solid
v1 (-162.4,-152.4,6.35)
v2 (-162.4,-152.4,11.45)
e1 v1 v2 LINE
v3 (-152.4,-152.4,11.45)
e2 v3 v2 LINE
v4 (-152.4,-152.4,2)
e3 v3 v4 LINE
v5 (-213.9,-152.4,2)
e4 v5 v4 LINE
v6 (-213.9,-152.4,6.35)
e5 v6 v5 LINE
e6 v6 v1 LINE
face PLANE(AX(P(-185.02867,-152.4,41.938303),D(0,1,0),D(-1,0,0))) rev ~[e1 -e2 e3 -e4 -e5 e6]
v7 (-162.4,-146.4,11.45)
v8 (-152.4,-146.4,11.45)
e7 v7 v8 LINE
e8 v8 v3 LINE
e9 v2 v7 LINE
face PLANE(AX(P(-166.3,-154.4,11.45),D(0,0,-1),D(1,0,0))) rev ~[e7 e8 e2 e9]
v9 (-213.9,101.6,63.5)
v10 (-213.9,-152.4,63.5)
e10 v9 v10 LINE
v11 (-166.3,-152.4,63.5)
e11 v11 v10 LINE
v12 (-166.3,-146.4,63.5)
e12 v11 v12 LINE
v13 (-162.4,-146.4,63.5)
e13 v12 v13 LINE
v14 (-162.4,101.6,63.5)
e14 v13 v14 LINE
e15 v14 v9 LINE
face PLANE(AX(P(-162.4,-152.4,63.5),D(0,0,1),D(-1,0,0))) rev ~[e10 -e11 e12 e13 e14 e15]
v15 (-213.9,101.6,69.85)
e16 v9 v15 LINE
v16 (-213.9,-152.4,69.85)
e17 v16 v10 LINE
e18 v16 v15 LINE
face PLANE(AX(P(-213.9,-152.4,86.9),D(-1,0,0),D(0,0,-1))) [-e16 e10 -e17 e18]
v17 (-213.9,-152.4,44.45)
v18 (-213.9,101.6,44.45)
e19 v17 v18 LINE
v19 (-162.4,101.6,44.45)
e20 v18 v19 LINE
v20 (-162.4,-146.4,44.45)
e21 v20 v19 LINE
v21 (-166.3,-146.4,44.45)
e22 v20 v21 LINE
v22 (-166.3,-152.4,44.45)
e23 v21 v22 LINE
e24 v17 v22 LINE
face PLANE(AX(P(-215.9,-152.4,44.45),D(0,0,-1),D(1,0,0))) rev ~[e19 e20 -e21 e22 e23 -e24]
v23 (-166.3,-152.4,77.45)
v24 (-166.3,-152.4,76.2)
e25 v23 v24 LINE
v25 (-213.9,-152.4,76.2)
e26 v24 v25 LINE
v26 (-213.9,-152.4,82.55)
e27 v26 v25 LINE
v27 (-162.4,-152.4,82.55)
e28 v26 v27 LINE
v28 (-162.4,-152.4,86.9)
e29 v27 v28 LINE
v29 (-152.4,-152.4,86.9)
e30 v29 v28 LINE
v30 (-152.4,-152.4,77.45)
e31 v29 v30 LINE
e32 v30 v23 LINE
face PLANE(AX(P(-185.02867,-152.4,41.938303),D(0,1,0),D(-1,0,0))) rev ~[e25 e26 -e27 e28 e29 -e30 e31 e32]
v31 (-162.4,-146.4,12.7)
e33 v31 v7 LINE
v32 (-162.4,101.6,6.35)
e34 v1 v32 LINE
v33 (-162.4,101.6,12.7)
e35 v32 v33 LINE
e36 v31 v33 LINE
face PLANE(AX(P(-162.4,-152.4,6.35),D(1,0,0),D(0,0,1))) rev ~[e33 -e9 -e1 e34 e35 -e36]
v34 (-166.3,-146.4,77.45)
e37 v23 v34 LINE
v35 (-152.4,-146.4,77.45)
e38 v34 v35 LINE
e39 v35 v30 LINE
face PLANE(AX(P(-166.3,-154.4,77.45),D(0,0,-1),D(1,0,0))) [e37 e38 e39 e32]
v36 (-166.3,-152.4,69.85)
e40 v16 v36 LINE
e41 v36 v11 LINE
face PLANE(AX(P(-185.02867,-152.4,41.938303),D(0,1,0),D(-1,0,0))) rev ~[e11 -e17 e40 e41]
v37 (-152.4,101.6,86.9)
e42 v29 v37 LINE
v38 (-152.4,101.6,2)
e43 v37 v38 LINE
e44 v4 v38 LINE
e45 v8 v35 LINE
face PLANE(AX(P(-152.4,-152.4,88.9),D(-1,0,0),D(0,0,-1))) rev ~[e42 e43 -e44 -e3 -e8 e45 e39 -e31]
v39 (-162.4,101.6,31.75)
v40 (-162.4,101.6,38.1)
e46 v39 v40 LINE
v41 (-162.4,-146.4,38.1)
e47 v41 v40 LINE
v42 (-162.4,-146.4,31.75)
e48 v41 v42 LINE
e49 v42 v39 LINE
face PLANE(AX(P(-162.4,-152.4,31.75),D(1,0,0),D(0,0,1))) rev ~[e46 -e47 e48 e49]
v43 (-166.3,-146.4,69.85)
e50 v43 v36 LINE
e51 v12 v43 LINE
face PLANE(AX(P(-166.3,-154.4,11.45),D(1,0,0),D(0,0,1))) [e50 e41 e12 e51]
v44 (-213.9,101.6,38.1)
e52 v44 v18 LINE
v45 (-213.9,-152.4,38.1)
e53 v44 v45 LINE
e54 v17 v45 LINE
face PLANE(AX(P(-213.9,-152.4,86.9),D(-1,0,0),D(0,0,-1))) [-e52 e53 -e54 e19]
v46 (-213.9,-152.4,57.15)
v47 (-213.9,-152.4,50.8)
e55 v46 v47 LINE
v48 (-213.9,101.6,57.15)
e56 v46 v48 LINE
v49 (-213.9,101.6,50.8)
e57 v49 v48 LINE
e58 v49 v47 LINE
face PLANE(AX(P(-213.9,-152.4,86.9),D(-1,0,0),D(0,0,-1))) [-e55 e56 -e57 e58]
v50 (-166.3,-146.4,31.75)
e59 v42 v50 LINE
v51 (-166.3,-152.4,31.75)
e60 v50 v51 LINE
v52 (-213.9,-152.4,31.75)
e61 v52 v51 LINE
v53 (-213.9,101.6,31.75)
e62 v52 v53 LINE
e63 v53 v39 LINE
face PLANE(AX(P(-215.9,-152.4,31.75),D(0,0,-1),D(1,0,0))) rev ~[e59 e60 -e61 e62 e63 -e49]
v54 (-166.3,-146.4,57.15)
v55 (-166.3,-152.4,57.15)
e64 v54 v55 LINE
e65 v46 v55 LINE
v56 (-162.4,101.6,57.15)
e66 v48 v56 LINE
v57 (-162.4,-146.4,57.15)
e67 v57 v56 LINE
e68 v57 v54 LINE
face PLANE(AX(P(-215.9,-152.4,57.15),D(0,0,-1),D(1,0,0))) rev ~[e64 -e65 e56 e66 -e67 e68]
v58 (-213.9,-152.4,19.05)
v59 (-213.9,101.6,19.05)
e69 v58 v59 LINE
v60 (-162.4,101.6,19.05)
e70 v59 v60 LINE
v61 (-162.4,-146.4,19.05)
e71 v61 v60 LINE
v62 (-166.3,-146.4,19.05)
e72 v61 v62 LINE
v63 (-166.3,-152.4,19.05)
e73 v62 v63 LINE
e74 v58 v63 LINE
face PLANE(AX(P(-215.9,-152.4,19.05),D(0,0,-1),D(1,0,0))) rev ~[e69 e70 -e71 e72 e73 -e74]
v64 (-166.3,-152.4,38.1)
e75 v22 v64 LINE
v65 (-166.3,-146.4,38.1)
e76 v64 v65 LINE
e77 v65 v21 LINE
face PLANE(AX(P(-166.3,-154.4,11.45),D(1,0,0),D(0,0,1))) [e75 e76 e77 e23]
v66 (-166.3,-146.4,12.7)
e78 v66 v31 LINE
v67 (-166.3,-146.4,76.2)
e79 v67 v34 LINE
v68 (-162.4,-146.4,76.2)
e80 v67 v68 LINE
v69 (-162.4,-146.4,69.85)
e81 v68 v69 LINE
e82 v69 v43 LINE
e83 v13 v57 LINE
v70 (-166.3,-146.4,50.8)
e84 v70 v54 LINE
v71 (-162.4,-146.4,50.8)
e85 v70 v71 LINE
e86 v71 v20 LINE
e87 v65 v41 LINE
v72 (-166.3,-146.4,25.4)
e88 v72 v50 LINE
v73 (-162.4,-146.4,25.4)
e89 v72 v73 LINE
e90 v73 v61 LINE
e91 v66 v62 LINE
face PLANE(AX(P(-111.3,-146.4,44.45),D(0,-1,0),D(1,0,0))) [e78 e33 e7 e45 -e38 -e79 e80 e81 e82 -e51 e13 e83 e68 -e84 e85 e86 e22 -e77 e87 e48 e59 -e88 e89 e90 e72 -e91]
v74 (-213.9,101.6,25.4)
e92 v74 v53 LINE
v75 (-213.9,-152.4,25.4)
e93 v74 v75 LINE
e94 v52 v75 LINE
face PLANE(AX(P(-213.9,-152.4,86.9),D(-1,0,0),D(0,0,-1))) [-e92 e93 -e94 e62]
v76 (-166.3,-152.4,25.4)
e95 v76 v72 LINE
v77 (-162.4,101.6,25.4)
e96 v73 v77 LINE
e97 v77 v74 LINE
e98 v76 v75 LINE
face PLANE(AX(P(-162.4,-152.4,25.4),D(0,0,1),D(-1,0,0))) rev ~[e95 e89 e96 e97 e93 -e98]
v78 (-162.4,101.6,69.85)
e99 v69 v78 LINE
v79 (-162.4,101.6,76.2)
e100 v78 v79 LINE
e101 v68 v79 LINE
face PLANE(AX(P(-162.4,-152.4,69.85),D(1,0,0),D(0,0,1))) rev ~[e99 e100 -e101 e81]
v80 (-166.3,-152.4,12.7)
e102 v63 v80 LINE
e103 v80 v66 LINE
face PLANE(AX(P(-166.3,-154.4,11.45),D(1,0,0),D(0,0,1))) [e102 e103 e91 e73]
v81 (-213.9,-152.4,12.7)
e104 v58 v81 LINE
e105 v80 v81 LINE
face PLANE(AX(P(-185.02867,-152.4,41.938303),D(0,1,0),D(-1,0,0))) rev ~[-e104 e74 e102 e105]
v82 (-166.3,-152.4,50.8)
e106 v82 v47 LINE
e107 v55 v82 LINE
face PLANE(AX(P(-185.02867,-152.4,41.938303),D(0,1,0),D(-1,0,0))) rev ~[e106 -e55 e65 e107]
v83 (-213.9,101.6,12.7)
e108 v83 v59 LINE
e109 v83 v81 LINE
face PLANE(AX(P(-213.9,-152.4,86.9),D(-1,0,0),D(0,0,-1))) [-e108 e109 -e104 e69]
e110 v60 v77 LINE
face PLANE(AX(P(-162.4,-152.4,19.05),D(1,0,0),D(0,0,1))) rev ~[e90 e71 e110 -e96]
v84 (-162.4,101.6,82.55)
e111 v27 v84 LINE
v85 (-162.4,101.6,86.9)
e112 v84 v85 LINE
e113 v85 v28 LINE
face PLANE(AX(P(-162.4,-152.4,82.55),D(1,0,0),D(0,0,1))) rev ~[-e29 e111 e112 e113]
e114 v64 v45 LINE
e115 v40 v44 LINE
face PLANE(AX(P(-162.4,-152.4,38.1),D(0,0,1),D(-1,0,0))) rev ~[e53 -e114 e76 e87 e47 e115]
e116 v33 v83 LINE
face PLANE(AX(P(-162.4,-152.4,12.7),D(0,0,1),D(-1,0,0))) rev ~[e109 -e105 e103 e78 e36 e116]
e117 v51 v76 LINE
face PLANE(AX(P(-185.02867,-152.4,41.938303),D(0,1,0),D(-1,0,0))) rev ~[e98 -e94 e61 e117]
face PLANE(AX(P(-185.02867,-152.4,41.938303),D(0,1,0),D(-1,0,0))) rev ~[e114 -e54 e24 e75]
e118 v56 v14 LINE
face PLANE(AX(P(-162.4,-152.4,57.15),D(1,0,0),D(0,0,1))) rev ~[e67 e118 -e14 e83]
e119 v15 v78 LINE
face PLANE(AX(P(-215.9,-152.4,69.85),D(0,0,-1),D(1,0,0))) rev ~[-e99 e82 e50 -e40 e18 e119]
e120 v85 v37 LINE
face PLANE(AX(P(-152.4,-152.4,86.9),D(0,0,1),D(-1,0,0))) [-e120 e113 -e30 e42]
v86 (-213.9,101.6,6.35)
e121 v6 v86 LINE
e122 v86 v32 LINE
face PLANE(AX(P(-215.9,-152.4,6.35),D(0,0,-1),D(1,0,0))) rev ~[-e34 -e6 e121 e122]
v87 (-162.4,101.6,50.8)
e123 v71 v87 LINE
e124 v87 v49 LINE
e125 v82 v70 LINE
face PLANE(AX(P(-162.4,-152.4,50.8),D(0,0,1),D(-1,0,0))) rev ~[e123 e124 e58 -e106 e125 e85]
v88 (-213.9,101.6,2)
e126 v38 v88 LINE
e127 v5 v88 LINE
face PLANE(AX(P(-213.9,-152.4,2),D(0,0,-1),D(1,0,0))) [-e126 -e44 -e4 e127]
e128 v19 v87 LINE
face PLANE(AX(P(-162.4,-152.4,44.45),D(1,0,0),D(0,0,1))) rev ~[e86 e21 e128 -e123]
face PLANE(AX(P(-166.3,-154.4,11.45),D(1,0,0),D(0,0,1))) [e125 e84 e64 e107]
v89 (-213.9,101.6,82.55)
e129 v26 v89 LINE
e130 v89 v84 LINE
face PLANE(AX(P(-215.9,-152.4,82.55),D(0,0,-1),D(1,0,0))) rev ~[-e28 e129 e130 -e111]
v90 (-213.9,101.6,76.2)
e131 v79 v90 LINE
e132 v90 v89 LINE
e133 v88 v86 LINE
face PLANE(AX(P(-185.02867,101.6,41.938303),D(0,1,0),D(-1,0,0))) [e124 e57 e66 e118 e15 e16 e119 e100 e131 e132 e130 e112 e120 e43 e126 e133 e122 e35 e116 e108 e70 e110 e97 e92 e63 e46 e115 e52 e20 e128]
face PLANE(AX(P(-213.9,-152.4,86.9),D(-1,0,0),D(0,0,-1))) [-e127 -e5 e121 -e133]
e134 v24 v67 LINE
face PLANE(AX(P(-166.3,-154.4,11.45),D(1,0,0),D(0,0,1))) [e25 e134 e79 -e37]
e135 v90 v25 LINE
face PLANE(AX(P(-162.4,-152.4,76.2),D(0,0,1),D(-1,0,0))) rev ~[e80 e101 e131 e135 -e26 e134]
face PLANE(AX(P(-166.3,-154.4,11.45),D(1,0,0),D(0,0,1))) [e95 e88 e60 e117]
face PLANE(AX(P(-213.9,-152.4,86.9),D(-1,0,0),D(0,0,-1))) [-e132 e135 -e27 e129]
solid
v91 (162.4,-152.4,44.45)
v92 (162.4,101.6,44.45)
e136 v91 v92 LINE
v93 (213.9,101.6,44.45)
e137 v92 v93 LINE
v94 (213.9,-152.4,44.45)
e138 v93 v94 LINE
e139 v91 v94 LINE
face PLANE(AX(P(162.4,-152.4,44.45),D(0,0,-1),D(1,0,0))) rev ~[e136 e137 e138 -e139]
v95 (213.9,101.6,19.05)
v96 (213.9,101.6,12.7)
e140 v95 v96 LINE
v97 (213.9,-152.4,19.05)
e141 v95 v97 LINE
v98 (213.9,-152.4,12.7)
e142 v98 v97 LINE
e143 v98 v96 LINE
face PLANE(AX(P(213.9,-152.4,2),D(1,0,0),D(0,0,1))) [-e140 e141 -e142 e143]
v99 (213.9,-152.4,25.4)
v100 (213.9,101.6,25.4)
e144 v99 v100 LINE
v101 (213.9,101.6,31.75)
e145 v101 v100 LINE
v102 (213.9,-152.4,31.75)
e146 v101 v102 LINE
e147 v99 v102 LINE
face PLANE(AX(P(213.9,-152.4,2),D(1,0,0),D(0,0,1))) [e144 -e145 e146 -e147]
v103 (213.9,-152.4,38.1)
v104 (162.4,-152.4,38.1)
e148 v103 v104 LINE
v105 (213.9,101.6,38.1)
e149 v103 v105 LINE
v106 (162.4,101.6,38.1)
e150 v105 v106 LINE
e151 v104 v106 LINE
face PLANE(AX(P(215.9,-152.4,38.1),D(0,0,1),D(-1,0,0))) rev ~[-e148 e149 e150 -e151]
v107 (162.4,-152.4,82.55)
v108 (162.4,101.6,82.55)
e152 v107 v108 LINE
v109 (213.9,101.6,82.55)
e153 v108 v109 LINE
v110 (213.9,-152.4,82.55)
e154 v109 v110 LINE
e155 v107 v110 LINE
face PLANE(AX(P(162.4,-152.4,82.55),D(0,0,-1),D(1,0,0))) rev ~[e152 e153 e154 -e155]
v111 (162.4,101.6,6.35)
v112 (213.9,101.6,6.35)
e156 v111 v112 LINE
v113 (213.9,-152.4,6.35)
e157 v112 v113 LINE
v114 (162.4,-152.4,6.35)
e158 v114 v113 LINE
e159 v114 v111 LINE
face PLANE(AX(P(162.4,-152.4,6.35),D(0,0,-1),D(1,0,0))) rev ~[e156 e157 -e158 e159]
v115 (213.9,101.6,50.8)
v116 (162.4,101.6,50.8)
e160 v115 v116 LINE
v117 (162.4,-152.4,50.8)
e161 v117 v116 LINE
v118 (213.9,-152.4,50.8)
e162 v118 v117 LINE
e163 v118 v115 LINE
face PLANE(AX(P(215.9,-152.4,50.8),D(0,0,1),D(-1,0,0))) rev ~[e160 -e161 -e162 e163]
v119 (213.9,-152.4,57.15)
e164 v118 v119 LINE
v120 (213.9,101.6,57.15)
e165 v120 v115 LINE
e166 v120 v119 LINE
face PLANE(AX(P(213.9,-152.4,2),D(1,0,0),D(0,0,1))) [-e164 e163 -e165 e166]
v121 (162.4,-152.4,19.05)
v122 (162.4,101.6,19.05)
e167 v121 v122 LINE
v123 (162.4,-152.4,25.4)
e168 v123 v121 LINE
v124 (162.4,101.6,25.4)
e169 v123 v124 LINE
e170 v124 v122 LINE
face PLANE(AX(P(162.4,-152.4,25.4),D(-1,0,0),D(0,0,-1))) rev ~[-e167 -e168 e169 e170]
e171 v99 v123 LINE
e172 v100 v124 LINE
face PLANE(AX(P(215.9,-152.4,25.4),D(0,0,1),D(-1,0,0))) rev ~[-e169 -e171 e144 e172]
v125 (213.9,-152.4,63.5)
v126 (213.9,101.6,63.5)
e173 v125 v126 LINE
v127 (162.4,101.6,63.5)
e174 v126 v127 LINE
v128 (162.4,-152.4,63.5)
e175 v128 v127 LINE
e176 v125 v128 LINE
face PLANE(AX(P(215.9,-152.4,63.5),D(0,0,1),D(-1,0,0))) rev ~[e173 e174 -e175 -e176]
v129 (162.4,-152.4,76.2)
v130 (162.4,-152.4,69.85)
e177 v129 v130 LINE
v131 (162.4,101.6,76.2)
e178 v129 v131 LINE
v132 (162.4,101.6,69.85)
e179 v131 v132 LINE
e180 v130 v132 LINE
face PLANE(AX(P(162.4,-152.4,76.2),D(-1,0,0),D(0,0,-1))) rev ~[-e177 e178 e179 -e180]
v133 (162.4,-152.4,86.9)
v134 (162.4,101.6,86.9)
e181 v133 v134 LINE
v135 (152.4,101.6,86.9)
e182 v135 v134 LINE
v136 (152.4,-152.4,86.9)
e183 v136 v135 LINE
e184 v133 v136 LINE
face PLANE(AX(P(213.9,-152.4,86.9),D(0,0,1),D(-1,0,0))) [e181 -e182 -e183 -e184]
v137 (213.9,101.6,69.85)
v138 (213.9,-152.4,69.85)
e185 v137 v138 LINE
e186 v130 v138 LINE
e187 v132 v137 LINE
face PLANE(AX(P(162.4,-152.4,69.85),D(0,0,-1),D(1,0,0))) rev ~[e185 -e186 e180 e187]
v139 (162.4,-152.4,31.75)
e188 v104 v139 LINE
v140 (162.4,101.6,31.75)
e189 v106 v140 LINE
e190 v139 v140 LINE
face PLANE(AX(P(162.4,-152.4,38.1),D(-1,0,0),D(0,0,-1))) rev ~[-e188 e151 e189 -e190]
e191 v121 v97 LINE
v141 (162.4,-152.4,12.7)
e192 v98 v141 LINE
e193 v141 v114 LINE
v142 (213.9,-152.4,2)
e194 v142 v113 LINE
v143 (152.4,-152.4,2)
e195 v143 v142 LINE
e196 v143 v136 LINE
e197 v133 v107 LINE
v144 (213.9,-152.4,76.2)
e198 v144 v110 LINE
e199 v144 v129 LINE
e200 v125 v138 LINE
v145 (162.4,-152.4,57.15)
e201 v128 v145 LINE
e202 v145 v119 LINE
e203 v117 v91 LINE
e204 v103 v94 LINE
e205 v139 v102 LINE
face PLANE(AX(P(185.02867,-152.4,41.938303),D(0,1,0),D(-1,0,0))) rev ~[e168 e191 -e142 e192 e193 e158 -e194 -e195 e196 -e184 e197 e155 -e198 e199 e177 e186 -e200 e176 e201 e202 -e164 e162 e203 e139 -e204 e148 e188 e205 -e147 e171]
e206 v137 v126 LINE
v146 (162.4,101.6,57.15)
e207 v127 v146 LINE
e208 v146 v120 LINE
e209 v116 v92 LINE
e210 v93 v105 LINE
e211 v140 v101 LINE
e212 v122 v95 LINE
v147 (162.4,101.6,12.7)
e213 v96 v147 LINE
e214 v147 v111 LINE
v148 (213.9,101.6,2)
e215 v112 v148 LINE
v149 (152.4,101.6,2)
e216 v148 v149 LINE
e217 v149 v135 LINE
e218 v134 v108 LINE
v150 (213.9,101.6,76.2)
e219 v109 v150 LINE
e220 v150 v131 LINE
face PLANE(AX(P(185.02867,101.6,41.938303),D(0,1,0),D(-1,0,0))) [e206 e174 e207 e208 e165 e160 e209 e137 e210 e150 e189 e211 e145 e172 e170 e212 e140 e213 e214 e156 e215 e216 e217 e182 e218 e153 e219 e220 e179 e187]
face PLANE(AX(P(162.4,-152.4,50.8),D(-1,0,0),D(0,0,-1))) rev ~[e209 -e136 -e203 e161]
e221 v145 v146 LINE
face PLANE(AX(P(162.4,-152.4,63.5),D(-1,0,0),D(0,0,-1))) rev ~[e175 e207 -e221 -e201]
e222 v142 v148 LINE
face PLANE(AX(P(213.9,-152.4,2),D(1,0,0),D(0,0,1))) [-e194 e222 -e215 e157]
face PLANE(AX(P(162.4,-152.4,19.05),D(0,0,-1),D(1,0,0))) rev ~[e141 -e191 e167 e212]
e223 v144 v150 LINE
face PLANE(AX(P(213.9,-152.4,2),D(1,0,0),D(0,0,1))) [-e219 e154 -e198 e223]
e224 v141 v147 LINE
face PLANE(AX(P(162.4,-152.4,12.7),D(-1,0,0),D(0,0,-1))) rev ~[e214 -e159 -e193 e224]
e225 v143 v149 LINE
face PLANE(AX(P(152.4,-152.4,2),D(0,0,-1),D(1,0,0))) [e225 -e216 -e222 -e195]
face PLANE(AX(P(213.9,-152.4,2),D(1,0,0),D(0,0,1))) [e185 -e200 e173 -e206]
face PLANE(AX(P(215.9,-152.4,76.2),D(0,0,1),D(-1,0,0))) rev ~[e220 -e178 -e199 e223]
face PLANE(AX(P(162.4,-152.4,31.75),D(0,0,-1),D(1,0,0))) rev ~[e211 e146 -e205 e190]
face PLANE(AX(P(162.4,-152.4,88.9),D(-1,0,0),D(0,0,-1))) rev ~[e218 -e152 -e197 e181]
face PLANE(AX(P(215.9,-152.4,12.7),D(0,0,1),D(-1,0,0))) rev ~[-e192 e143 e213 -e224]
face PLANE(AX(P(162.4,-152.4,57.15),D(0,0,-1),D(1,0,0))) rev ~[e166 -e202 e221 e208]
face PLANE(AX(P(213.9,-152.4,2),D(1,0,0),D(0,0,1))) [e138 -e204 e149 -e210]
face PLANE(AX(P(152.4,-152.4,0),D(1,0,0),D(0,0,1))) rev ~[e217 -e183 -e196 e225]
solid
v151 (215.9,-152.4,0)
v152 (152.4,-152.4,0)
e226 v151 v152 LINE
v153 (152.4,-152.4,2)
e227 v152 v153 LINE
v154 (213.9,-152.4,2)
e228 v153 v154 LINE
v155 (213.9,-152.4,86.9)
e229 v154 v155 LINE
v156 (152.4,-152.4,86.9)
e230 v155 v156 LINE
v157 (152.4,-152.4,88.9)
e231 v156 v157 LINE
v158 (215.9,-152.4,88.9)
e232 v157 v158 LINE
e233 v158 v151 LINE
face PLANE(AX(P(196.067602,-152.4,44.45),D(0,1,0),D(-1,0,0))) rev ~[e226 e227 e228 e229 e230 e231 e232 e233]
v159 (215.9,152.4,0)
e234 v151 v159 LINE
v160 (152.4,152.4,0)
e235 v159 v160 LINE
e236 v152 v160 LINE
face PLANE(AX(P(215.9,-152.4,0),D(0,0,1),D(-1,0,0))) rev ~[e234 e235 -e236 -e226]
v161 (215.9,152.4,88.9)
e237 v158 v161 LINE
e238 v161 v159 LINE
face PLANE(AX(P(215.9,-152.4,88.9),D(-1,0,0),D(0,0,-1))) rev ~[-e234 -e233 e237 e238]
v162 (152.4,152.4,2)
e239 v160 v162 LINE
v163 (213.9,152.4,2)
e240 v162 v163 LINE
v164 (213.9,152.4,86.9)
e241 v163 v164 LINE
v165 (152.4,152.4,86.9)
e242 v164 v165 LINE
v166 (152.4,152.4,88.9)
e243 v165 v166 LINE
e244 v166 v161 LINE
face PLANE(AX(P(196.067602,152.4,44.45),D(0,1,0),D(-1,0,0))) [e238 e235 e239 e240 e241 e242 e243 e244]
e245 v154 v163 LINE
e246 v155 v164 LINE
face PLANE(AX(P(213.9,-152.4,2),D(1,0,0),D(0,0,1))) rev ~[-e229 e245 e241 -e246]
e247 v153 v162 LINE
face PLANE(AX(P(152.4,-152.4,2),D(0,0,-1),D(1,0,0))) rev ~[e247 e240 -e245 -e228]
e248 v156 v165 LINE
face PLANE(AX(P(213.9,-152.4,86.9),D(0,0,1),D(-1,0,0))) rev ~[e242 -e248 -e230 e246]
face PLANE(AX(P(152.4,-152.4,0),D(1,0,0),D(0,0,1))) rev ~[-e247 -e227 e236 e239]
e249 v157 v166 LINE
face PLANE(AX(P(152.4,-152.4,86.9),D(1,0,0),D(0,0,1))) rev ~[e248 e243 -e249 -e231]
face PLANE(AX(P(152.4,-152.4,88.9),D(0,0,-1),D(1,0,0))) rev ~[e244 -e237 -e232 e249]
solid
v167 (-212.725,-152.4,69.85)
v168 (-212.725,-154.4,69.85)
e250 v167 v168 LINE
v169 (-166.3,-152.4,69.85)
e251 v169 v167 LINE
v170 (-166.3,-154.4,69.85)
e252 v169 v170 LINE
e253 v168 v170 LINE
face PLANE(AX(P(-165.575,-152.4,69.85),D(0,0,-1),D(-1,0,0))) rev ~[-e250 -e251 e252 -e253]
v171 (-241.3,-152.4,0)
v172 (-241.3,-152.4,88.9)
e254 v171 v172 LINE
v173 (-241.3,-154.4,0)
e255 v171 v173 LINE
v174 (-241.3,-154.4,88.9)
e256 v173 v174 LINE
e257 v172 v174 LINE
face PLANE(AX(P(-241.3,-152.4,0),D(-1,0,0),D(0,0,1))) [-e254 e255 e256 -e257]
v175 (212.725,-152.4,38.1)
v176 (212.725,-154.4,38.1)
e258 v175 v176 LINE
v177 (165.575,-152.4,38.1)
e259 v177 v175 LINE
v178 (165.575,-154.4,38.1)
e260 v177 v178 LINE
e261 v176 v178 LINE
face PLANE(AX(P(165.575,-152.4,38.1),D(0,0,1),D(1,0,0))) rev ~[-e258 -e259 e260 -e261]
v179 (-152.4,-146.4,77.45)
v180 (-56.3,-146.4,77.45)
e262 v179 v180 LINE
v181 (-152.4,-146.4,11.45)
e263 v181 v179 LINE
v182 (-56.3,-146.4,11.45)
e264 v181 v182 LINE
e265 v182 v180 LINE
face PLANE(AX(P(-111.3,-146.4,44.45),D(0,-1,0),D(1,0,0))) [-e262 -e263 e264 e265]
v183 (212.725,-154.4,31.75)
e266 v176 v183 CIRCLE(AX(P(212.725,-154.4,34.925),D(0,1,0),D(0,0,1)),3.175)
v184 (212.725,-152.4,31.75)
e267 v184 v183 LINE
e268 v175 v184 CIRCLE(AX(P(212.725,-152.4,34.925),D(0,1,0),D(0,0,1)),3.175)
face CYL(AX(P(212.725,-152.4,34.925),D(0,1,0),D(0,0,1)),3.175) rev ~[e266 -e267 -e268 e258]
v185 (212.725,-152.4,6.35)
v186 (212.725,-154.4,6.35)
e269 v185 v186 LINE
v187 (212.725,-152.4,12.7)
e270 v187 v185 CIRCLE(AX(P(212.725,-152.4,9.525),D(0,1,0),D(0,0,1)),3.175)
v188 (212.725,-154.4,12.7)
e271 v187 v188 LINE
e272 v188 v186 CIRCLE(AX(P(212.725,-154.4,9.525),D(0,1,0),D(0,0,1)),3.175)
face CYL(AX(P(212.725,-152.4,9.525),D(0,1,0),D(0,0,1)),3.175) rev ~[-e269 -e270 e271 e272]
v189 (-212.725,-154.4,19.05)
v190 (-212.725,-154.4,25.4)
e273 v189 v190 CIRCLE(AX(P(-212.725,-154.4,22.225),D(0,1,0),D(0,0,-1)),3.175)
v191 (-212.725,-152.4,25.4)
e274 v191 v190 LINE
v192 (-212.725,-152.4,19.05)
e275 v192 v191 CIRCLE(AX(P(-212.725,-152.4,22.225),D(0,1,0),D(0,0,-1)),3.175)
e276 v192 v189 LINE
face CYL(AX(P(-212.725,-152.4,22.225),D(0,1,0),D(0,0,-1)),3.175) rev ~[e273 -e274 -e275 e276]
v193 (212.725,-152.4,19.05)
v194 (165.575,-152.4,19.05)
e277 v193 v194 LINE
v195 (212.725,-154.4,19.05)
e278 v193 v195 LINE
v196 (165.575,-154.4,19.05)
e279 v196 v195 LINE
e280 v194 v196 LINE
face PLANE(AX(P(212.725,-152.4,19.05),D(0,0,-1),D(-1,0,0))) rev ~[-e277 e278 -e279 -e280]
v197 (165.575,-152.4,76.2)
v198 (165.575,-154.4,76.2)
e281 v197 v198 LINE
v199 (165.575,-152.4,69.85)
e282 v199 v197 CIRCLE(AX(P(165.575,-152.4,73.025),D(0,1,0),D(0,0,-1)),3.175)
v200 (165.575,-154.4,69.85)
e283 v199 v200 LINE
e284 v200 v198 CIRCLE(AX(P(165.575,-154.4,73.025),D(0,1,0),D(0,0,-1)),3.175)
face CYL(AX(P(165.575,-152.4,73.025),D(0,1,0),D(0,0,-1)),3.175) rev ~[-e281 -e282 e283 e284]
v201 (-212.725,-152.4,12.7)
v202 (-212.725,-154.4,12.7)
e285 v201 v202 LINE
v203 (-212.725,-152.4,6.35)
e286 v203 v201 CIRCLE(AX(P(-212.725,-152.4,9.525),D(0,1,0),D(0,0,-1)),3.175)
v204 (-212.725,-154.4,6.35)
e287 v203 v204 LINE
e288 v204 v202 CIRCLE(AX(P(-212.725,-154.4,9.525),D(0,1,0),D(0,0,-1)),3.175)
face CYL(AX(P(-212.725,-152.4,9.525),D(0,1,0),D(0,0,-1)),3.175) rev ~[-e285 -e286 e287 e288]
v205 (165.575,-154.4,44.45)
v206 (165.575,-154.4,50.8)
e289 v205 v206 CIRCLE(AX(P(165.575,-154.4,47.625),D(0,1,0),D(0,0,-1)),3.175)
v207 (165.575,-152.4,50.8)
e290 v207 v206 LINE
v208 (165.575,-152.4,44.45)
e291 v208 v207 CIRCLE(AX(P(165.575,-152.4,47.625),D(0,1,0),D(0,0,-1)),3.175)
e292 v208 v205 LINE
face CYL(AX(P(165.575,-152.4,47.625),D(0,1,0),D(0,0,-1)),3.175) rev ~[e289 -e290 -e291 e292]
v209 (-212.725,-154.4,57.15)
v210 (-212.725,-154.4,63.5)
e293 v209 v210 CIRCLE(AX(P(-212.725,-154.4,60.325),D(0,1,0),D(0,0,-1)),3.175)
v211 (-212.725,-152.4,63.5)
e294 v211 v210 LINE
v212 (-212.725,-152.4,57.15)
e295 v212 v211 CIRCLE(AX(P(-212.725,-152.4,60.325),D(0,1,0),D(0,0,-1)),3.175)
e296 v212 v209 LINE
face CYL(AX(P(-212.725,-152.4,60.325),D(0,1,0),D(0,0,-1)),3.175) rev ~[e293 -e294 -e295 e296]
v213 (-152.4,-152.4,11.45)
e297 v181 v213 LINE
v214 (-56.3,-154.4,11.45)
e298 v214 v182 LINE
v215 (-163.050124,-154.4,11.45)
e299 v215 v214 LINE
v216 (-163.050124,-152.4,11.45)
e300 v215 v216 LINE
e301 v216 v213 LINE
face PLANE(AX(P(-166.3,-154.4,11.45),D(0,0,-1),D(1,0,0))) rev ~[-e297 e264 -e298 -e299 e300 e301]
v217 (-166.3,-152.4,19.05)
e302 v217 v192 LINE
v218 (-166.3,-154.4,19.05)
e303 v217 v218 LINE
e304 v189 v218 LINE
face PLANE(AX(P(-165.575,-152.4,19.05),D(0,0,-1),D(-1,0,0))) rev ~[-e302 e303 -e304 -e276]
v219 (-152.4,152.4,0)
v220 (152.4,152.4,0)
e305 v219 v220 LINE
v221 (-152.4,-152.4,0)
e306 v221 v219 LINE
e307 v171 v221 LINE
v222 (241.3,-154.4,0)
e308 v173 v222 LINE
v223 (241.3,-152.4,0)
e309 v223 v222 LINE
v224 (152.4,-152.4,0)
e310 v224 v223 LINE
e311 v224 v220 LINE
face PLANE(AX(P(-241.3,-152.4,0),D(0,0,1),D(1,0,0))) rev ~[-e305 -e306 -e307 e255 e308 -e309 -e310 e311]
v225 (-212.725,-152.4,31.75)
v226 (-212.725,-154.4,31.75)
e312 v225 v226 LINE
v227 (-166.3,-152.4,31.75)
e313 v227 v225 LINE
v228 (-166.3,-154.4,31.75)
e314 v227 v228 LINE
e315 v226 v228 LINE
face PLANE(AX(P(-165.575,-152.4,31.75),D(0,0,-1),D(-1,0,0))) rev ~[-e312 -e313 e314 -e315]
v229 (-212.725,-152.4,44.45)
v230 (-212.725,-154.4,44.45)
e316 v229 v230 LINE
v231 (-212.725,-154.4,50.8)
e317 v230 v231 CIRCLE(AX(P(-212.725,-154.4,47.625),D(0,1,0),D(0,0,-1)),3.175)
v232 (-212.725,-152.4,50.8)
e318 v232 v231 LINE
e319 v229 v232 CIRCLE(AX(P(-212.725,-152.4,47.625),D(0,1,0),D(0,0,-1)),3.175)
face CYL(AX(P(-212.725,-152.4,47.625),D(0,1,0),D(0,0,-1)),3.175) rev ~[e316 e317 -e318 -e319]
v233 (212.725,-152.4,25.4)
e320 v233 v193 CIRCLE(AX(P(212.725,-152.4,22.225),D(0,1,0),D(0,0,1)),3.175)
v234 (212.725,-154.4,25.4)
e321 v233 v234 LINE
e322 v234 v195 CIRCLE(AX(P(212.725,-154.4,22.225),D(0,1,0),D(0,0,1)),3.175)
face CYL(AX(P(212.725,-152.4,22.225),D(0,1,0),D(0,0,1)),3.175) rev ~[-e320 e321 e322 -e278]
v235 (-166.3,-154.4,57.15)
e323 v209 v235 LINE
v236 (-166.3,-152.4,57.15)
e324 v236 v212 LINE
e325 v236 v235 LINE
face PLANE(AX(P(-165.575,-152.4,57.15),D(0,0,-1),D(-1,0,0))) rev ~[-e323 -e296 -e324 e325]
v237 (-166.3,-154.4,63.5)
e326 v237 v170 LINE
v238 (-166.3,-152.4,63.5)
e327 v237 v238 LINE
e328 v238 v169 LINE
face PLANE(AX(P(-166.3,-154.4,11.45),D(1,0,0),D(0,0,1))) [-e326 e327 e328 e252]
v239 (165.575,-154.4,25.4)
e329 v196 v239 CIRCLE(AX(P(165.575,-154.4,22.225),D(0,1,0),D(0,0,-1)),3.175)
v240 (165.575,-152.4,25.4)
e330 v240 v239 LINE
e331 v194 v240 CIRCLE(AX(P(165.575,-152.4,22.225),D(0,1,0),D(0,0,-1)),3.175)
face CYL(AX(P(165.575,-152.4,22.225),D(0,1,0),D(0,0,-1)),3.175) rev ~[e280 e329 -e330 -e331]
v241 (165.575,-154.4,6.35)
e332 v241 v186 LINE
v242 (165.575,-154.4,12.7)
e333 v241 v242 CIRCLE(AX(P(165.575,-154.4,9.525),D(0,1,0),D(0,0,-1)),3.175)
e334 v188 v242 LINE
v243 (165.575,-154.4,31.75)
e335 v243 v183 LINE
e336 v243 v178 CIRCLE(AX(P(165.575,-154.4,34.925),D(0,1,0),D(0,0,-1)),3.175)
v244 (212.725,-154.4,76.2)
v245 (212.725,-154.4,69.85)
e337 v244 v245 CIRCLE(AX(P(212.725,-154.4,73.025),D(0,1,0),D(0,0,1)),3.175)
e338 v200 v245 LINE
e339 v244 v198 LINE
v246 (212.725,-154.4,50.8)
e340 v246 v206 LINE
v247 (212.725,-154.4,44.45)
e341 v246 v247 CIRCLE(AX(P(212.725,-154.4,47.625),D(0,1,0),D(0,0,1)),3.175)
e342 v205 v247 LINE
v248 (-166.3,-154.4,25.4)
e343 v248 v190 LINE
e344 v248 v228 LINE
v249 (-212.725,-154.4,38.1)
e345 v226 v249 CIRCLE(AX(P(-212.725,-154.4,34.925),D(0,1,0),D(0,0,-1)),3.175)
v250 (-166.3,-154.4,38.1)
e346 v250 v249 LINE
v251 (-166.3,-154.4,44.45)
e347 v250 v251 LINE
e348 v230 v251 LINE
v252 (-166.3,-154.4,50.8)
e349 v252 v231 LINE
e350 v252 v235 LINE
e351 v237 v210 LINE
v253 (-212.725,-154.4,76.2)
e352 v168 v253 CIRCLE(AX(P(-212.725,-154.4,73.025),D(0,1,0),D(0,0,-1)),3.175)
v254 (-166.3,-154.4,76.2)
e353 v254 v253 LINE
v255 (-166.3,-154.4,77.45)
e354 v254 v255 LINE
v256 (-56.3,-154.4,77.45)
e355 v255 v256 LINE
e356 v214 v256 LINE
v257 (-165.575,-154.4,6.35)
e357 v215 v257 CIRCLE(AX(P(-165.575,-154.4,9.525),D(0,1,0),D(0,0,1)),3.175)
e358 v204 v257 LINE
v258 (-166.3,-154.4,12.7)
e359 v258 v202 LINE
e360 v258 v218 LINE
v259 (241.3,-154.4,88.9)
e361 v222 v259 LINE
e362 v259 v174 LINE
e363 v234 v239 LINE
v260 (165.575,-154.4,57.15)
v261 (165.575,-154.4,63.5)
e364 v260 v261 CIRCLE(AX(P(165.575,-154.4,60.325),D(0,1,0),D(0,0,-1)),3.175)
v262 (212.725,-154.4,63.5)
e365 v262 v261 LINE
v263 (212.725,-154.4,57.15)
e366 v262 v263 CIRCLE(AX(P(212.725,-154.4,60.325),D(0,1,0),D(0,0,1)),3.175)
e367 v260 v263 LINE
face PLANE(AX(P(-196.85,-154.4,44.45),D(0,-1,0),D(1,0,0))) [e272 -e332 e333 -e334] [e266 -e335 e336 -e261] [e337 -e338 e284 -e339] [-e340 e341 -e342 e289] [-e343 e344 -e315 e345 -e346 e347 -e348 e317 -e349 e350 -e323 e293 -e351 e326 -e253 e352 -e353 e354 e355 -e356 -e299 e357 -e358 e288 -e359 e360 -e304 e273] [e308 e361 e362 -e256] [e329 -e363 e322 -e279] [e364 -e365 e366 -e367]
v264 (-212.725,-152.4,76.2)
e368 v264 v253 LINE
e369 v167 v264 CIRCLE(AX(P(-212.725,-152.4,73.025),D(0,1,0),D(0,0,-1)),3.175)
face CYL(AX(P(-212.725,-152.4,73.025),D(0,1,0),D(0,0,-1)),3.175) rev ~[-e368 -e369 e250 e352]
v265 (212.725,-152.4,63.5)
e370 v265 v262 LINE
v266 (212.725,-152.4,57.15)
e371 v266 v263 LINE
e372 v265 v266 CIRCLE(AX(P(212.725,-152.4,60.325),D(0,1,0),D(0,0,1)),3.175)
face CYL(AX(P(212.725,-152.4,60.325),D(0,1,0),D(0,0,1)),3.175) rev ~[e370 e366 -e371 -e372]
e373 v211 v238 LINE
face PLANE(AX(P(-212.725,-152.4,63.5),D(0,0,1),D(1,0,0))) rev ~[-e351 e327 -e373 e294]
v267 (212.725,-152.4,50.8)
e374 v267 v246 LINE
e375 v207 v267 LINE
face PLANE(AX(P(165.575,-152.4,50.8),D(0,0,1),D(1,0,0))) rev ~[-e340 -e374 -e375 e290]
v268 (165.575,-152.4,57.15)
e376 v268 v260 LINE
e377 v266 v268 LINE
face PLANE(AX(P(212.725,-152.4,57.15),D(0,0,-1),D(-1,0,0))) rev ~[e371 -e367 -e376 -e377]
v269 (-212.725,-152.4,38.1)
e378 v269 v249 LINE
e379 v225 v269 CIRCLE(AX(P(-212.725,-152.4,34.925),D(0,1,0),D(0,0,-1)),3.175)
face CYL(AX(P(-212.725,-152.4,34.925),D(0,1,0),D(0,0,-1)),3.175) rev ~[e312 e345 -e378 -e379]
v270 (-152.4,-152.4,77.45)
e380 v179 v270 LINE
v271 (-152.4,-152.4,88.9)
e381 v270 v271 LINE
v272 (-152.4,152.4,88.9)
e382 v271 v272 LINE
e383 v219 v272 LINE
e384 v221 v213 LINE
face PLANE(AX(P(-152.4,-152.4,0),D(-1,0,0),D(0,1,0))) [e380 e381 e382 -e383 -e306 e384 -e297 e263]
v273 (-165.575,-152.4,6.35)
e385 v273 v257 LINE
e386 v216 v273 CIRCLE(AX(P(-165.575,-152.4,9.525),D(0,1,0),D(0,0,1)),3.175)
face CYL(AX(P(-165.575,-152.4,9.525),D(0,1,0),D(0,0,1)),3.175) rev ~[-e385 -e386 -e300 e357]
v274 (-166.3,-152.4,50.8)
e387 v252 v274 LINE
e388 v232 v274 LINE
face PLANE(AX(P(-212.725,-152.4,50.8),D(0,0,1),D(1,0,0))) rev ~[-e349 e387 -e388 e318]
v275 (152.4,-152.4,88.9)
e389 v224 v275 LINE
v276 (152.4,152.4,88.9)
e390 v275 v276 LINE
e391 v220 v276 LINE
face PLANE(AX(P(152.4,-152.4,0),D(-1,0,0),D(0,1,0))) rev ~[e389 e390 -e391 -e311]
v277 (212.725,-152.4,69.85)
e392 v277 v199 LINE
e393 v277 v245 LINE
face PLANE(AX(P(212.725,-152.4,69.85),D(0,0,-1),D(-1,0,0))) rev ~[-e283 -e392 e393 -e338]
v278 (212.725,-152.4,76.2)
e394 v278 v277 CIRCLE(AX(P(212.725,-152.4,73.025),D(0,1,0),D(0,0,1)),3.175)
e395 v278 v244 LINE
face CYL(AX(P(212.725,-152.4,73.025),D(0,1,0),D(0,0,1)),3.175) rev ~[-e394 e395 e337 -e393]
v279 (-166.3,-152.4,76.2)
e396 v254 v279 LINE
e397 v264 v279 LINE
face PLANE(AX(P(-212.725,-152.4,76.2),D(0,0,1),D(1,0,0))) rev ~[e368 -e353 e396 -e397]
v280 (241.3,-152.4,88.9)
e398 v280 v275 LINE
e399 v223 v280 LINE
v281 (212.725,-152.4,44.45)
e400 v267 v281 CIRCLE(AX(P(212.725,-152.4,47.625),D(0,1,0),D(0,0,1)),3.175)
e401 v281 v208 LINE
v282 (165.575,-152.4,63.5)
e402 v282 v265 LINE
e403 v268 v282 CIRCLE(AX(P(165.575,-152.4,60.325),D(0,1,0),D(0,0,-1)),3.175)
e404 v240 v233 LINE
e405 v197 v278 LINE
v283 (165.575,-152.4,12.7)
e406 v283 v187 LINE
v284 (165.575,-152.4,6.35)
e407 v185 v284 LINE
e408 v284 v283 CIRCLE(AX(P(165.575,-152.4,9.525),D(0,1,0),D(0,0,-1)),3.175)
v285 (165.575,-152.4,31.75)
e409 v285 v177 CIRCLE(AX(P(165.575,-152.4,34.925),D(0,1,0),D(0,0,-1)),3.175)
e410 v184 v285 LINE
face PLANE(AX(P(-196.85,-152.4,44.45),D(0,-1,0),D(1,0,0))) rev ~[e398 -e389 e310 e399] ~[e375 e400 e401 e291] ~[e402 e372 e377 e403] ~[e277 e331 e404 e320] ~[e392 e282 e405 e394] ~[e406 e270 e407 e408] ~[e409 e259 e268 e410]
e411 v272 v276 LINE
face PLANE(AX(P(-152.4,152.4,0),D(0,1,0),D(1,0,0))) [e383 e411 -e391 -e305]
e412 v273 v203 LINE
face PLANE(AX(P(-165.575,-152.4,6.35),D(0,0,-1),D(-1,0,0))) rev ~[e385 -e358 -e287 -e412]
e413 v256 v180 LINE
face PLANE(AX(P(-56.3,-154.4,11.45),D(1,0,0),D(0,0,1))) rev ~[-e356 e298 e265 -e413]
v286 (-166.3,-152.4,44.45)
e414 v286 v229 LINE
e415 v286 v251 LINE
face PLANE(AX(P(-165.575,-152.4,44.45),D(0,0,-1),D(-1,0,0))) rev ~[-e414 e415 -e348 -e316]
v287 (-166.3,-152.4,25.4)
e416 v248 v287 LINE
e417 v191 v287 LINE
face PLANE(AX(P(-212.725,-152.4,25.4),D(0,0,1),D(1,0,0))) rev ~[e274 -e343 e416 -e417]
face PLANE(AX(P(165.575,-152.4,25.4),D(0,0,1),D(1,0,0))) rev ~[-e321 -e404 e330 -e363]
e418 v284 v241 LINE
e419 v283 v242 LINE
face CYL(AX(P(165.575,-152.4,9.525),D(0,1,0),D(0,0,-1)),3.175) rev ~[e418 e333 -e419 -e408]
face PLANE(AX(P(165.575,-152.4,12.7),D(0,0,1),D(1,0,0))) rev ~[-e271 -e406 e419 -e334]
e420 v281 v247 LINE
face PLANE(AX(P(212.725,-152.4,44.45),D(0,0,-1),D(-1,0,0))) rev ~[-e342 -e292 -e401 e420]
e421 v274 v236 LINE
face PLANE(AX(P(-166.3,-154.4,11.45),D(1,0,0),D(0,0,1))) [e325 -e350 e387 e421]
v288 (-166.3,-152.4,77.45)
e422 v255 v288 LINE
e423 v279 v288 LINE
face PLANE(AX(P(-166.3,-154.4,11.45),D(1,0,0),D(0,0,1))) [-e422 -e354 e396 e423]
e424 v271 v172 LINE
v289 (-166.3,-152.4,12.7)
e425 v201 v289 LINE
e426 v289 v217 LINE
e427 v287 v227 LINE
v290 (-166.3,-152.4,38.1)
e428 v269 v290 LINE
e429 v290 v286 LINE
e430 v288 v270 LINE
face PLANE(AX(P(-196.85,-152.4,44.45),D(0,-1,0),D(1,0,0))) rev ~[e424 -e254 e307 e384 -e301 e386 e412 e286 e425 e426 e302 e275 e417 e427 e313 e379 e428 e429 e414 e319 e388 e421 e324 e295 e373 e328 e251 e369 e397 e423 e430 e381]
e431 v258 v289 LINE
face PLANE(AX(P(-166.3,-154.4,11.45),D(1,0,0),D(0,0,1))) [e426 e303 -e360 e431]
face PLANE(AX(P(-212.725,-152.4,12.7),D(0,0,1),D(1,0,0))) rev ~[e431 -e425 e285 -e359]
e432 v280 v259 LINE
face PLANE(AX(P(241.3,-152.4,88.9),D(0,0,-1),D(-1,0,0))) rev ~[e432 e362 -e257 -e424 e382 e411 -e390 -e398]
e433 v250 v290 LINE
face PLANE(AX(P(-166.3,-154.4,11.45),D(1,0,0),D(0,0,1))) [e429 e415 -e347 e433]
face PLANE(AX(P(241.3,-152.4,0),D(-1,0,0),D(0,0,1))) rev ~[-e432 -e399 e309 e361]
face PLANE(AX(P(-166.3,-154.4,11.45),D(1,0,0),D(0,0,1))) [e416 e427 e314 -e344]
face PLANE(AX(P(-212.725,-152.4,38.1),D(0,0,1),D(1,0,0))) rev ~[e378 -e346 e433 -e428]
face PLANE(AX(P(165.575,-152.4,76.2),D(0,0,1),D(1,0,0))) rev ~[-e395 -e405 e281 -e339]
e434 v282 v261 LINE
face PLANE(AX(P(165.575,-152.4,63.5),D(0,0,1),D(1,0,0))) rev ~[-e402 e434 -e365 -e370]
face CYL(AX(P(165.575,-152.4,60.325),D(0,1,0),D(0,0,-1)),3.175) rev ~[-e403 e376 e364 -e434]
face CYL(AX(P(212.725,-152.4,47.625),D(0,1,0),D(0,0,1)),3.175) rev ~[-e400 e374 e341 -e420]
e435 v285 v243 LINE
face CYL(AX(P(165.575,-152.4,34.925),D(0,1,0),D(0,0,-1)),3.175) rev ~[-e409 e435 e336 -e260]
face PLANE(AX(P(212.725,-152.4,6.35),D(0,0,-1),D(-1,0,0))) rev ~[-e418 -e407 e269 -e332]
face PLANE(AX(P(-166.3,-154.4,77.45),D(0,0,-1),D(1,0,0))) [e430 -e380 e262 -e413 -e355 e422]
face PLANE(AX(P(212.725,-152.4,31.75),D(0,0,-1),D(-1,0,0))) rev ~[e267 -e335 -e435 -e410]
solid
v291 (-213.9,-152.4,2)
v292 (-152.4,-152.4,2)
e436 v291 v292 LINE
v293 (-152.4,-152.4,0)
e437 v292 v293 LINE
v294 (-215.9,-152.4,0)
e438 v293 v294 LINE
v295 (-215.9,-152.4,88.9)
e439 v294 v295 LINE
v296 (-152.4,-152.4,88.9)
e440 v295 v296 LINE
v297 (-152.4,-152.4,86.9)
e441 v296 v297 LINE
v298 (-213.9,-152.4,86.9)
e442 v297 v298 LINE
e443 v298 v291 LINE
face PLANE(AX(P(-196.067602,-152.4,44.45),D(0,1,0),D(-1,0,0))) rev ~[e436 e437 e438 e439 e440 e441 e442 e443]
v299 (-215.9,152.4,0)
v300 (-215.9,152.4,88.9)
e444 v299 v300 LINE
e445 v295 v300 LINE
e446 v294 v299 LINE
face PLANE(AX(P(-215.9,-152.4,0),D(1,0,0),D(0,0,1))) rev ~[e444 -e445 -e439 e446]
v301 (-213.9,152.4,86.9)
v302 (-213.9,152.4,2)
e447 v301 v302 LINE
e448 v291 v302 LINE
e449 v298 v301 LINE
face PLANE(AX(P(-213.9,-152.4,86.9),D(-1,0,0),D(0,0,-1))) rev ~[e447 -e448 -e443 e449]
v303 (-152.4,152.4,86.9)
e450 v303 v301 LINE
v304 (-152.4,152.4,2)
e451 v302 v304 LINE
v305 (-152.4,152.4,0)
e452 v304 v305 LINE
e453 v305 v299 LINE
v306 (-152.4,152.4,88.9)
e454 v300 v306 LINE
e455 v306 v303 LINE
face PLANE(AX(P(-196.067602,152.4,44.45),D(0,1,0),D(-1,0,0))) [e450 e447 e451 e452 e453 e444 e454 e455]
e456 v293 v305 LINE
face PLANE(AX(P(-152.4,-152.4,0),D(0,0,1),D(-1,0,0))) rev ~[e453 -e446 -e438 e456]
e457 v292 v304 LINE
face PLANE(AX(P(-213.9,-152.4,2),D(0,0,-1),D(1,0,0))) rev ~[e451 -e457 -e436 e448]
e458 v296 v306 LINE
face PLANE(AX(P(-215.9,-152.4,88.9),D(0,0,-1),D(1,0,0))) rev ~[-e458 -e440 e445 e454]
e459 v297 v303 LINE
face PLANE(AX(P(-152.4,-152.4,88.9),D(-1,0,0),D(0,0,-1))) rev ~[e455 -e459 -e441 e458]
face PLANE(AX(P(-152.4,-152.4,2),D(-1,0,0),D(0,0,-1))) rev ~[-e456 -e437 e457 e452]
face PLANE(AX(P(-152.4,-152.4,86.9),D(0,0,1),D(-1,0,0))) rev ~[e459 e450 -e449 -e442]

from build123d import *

# Parameters (mm, degrees)
F0_W      = 304.8
F0_H      = 304.8
F1_DEPTH  = 88.9
F2_W      = 88.9
F2_H      = 88.9
F2_W_2    = 304.8
F3_DEPTH  = 2
F5_DEPTH  = 254
F7_DEPTH  = 2.001
F9_DEPTH  = 304.801
F10_DEPTH = 304.8
F11_W     = 110
F11_H     = 66
F12_DEPTH = 8


with BuildPart() as f1:
    # F0 (on Top) → F1 (new body)
    with BuildSketch(Plane.XY):
        Rectangle(F0_W, F0_H)
    extrude(amount=F1_DEPTH)

    # F2 (on face) → F3 (join)
    with BuildSketch(Plane.XZ.offset(152.4)):
        with Locations((-196.85, 44.45)):
            Rectangle(F2_W, F2_H)
        with Locations((0, 44.45)):
            Rectangle(F2_W_2, F2_H)
        with Locations((196.85, 44.45)):
            Rectangle(F2_W, F2_H)
    extrude(amount=F3_DEPTH)

    # F6 (on face) → F7 (cut, through all)
    with BuildSketch(Plane(origin=(0, -152.4, 0), x_dir=(-1, 0, 0), z_dir=(0, 1, 0))):
        with BuildLine():
            Line((-165.575, 76.2), (-212.725, 76.2))
            ThreePointArc((-212.725, 76.2), (-215.9, 73.025), (-212.725, 69.85))
            Line((-212.725, 69.85), (-165.575, 69.85))
            ThreePointArc((-165.575, 69.85), (-162.4, 73.025), (-165.575, 76.2))
        make_face()
        with BuildLine():
            Line((-165.575, 63.5), (-212.725, 63.5))
            ThreePointArc((-212.725, 63.5), (-215.9, 60.325), (-212.725, 57.15))
            Line((-212.725, 57.15), (-165.575, 57.15))
            ThreePointArc((-165.575, 57.15), (-162.4, 60.325), (-165.575, 63.5))
        make_face()
        with BuildLine():
            Line((-165.575, 50.8), (-212.725, 50.8))
            ThreePointArc((-212.725, 50.8), (-215.9, 47.625), (-212.725, 44.45))
            Line((-212.725, 44.45), (-165.575, 44.45))
            ThreePointArc((-165.575, 44.45), (-162.4, 47.625), (-165.575, 50.8))
        make_face()
        with BuildLine():
            Line((-165.575, 38.1), (-212.725, 38.1))
            ThreePointArc((-212.725, 38.1), (-215.9, 34.925), (-212.725, 31.75))
            Line((-212.725, 31.75), (-165.575, 31.75))
            ThreePointArc((-165.575, 31.75), (-162.4, 34.925), (-165.575, 38.1))
        make_face()
        with BuildLine():
            Line((-165.575, 25.4), (-212.725, 25.4))
            ThreePointArc((-212.725, 25.4), (-215.9, 22.225), (-212.725, 19.05))
            Line((-212.725, 19.05), (-165.575, 19.05))
            ThreePointArc((-165.575, 19.05), (-162.4, 22.225), (-165.575, 25.4))
        make_face()
        with BuildLine():
            Line((-165.575, 12.7), (-212.725, 12.7))
            ThreePointArc((-212.725, 12.7), (-215.9, 9.525), (-212.725, 6.35))
            Line((-212.725, 6.35), (-165.575, 6.35))
            ThreePointArc((-165.575, 6.35), (-162.4, 9.525), (-165.575, 12.7))
        make_face()
        with BuildLine():
            ThreePointArc((212.725, 31.75), (215.9, 34.925), (212.725, 38.1))
            Line((212.725, 38.1), (165.575, 38.1))
            ThreePointArc((165.575, 38.1), (162.4, 34.925), (165.575, 31.75))
            Line((165.575, 31.75), (212.725, 31.75))
        make_face()
        with BuildLine():
            Line((165.575, 6.35), (212.725, 6.35))
            ThreePointArc((212.725, 6.35), (215.9, 9.525), (212.725, 12.7))
            Line((212.725, 12.7), (165.575, 12.7))
            ThreePointArc((165.575, 12.7), (162.4, 9.525), (165.575, 6.35))
        make_face()
        with BuildLine():
            ThreePointArc((165.575, 50.8), (162.4, 47.625), (165.575, 44.45))
            Line((165.575, 44.45), (212.725, 44.45))
            ThreePointArc((212.725, 44.45), (215.9, 47.625), (212.725, 50.8))
            Line((212.725, 50.8), (165.575, 50.8))
        make_face()
        with BuildLine():
            ThreePointArc((165.575, 63.5), (162.4, 60.325), (165.575, 57.15))
            Line((165.575, 57.15), (212.725, 57.15))
            ThreePointArc((212.725, 57.15), (215.9, 60.325), (212.725, 63.5))
            Line((212.725, 63.5), (165.575, 63.5))
        make_face()
        with BuildLine():
            ThreePointArc((212.725, 69.85), (215.9, 73.025), (212.725, 76.2))
            Line((212.725, 76.2), (165.575, 76.2))
            ThreePointArc((165.575, 76.2), (162.4, 73.025), (165.575, 69.85))
            Line((165.575, 69.85), (212.725, 69.85))
        make_face()
        with BuildLine():
            Line((165.575, 19.05), (212.725, 19.05))
            ThreePointArc((212.725, 19.05), (215.9, 22.225), (212.725, 25.4))
            Line((212.725, 25.4), (165.575, 25.4))
            ThreePointArc((165.575, 25.4), (162.4, 22.225), (165.575, 19.05))
        make_face()
    extrude(amount=-F7_DEPTH, mode=Mode.SUBTRACT)


with BuildPart() as f5:
    # F4 (on face) → F5 (new body)
    with BuildSketch(Plane(origin=(0, -152.4, 0), x_dir=(-1, 0, 0), z_dir=(0, 1, 0))):
        Polygon((-152.4, 0), (-152.4, 88.9), (-162.4, 88.9), (-162.4, 82.55), (-215.9, 82.55), (-215.9, 76.2), (-162.4, 76.2), (-162.4, 69.85), (-215.9, 69.85), (-215.9, 63.5), (-162.4, 63.5), (-162.4, 57.15), (-215.9, 57.15), (-215.9, 50.8), (-162.4, 50.8), (-162.4, 44.45), (-215.9, 44.45), (-215.9, 38.1), (-162.4, 38.1), (-162.4, 31.75), (-215.9, 31.75), (-215.9, 25.4), (-162.4, 25.4), (-162.4, 19.05), (-215.9, 19.05), (-215.9, 12.7), (-162.4, 12.7), (-162.4, 6.35), (-215.9, 6.35), (-215.9, 0), (-162.4, 0), align=None)
    extrude(amount=F5_DEPTH)


with BuildPart() as f5b:
    # F4 (on face) → F5, piece 2 (new body)
    with BuildSketch(Plane(origin=(0, -152.4, 0), x_dir=(-1, 0, 0), z_dir=(0, 1, 0))):
        Polygon((215.9, 63.5), (215.9, 69.85), (162.4, 69.85), (162.4, 76.2), (215.9, 76.2), (215.9, 82.55), (162.4, 82.55), (162.4, 88.9), (152.4, 88.9), (152.4, 0), (162.4, 0), (215.9, 0), (215.9, 6.35), (162.4, 6.35), (162.4, 12.7), (215.9, 12.7), (215.9, 19.05), (162.4, 19.05), (162.4, 25.4), (215.9, 25.4), (215.9, 31.75), (162.4, 31.75), (162.4, 38.1), (215.9, 38.1), (215.9, 44.45), (162.4, 44.45), (162.4, 50.8), (215.9, 50.8), (215.9, 57.15), (162.4, 57.15), (162.4, 63.5), align=None)
    extrude(amount=F5_DEPTH)


with BuildPart() as f9_tool:
    # F8 (on face) → F9 (new body, through all)
    with BuildSketch(Plane(origin=(0, -152.4, 0), x_dir=(-1, 0, 0), z_dir=(0, 1, 0))):
        Polygon((-152.4, 86.9), (-152.4, 88.9), (-215.9, 88.9), (-215.9, 0), (-152.4, 0), (-152.4, 2), (-213.9, 2), (-213.9, 86.9), align=None)
        Polygon((215.9, 88.9), (152.4, 88.9), (152.4, 86.9), (213.9, 86.9), (213.9, 2), (152.4, 2), (152.4, 0), (215.9, 0), align=None)
    extrude(amount=F9_DEPTH)


with BuildPart() as f5_1:
    add(f5.part)

    # F9: cut by f9_tool
    add(f9_tool.part, mode=Mode.SUBTRACT)


with BuildPart() as f5b_1:
    add(f5b.part)

    # F9: cut by f9_tool
    add(f9_tool.part, mode=Mode.SUBTRACT)


with BuildPart() as f10:
    # F8 (on face) → F10 (new body)
    with BuildSketch(Plane(origin=(0, -152.4, 0), x_dir=(-1, 0, 0), z_dir=(0, 1, 0))):
        Polygon((-152.4, 86.9), (-152.4, 88.9), (-215.9, 88.9), (-215.9, 0), (-152.4, 0), (-152.4, 2), (-213.9, 2), (-213.9, 86.9), align=None)
    extrude(amount=F10_DEPTH)


with BuildPart() as f10b:
    # F8 (on face) → F10, piece 2 (new body)
    with BuildSketch(Plane(origin=(0, -152.4, 0), x_dir=(-1, 0, 0), z_dir=(0, 1, 0))):
        Polygon((215.9, 88.9), (152.4, 88.9), (152.4, 86.9), (213.9, 86.9), (213.9, 2), (152.4, 2), (152.4, 0), (215.9, 0), align=None)
    extrude(amount=F10_DEPTH)


with BuildPart() as f12_tool:
    # F11 (on face) → F12 (new body)
    with BuildSketch(Plane.XZ.offset(154.4)):
        with Locations((-111.3, 44.45)):
            Rectangle(F11_W, F11_H)
    extrude(amount=-F12_DEPTH)


with BuildPart() as f1_1:
    add(f1.part)

    # F12: cut by f12_tool
    add(f12_tool.part, mode=Mode.SUBTRACT)


with BuildPart() as f5b_2:
    add(f5b_1.part)

    # F12: cut by f12_tool
    add(f12_tool.part, mode=Mode.SUBTRACT)


solid = Compound([f5_1.part, f10.part, f10b.part, f1_1.part, f5b_2.part])
